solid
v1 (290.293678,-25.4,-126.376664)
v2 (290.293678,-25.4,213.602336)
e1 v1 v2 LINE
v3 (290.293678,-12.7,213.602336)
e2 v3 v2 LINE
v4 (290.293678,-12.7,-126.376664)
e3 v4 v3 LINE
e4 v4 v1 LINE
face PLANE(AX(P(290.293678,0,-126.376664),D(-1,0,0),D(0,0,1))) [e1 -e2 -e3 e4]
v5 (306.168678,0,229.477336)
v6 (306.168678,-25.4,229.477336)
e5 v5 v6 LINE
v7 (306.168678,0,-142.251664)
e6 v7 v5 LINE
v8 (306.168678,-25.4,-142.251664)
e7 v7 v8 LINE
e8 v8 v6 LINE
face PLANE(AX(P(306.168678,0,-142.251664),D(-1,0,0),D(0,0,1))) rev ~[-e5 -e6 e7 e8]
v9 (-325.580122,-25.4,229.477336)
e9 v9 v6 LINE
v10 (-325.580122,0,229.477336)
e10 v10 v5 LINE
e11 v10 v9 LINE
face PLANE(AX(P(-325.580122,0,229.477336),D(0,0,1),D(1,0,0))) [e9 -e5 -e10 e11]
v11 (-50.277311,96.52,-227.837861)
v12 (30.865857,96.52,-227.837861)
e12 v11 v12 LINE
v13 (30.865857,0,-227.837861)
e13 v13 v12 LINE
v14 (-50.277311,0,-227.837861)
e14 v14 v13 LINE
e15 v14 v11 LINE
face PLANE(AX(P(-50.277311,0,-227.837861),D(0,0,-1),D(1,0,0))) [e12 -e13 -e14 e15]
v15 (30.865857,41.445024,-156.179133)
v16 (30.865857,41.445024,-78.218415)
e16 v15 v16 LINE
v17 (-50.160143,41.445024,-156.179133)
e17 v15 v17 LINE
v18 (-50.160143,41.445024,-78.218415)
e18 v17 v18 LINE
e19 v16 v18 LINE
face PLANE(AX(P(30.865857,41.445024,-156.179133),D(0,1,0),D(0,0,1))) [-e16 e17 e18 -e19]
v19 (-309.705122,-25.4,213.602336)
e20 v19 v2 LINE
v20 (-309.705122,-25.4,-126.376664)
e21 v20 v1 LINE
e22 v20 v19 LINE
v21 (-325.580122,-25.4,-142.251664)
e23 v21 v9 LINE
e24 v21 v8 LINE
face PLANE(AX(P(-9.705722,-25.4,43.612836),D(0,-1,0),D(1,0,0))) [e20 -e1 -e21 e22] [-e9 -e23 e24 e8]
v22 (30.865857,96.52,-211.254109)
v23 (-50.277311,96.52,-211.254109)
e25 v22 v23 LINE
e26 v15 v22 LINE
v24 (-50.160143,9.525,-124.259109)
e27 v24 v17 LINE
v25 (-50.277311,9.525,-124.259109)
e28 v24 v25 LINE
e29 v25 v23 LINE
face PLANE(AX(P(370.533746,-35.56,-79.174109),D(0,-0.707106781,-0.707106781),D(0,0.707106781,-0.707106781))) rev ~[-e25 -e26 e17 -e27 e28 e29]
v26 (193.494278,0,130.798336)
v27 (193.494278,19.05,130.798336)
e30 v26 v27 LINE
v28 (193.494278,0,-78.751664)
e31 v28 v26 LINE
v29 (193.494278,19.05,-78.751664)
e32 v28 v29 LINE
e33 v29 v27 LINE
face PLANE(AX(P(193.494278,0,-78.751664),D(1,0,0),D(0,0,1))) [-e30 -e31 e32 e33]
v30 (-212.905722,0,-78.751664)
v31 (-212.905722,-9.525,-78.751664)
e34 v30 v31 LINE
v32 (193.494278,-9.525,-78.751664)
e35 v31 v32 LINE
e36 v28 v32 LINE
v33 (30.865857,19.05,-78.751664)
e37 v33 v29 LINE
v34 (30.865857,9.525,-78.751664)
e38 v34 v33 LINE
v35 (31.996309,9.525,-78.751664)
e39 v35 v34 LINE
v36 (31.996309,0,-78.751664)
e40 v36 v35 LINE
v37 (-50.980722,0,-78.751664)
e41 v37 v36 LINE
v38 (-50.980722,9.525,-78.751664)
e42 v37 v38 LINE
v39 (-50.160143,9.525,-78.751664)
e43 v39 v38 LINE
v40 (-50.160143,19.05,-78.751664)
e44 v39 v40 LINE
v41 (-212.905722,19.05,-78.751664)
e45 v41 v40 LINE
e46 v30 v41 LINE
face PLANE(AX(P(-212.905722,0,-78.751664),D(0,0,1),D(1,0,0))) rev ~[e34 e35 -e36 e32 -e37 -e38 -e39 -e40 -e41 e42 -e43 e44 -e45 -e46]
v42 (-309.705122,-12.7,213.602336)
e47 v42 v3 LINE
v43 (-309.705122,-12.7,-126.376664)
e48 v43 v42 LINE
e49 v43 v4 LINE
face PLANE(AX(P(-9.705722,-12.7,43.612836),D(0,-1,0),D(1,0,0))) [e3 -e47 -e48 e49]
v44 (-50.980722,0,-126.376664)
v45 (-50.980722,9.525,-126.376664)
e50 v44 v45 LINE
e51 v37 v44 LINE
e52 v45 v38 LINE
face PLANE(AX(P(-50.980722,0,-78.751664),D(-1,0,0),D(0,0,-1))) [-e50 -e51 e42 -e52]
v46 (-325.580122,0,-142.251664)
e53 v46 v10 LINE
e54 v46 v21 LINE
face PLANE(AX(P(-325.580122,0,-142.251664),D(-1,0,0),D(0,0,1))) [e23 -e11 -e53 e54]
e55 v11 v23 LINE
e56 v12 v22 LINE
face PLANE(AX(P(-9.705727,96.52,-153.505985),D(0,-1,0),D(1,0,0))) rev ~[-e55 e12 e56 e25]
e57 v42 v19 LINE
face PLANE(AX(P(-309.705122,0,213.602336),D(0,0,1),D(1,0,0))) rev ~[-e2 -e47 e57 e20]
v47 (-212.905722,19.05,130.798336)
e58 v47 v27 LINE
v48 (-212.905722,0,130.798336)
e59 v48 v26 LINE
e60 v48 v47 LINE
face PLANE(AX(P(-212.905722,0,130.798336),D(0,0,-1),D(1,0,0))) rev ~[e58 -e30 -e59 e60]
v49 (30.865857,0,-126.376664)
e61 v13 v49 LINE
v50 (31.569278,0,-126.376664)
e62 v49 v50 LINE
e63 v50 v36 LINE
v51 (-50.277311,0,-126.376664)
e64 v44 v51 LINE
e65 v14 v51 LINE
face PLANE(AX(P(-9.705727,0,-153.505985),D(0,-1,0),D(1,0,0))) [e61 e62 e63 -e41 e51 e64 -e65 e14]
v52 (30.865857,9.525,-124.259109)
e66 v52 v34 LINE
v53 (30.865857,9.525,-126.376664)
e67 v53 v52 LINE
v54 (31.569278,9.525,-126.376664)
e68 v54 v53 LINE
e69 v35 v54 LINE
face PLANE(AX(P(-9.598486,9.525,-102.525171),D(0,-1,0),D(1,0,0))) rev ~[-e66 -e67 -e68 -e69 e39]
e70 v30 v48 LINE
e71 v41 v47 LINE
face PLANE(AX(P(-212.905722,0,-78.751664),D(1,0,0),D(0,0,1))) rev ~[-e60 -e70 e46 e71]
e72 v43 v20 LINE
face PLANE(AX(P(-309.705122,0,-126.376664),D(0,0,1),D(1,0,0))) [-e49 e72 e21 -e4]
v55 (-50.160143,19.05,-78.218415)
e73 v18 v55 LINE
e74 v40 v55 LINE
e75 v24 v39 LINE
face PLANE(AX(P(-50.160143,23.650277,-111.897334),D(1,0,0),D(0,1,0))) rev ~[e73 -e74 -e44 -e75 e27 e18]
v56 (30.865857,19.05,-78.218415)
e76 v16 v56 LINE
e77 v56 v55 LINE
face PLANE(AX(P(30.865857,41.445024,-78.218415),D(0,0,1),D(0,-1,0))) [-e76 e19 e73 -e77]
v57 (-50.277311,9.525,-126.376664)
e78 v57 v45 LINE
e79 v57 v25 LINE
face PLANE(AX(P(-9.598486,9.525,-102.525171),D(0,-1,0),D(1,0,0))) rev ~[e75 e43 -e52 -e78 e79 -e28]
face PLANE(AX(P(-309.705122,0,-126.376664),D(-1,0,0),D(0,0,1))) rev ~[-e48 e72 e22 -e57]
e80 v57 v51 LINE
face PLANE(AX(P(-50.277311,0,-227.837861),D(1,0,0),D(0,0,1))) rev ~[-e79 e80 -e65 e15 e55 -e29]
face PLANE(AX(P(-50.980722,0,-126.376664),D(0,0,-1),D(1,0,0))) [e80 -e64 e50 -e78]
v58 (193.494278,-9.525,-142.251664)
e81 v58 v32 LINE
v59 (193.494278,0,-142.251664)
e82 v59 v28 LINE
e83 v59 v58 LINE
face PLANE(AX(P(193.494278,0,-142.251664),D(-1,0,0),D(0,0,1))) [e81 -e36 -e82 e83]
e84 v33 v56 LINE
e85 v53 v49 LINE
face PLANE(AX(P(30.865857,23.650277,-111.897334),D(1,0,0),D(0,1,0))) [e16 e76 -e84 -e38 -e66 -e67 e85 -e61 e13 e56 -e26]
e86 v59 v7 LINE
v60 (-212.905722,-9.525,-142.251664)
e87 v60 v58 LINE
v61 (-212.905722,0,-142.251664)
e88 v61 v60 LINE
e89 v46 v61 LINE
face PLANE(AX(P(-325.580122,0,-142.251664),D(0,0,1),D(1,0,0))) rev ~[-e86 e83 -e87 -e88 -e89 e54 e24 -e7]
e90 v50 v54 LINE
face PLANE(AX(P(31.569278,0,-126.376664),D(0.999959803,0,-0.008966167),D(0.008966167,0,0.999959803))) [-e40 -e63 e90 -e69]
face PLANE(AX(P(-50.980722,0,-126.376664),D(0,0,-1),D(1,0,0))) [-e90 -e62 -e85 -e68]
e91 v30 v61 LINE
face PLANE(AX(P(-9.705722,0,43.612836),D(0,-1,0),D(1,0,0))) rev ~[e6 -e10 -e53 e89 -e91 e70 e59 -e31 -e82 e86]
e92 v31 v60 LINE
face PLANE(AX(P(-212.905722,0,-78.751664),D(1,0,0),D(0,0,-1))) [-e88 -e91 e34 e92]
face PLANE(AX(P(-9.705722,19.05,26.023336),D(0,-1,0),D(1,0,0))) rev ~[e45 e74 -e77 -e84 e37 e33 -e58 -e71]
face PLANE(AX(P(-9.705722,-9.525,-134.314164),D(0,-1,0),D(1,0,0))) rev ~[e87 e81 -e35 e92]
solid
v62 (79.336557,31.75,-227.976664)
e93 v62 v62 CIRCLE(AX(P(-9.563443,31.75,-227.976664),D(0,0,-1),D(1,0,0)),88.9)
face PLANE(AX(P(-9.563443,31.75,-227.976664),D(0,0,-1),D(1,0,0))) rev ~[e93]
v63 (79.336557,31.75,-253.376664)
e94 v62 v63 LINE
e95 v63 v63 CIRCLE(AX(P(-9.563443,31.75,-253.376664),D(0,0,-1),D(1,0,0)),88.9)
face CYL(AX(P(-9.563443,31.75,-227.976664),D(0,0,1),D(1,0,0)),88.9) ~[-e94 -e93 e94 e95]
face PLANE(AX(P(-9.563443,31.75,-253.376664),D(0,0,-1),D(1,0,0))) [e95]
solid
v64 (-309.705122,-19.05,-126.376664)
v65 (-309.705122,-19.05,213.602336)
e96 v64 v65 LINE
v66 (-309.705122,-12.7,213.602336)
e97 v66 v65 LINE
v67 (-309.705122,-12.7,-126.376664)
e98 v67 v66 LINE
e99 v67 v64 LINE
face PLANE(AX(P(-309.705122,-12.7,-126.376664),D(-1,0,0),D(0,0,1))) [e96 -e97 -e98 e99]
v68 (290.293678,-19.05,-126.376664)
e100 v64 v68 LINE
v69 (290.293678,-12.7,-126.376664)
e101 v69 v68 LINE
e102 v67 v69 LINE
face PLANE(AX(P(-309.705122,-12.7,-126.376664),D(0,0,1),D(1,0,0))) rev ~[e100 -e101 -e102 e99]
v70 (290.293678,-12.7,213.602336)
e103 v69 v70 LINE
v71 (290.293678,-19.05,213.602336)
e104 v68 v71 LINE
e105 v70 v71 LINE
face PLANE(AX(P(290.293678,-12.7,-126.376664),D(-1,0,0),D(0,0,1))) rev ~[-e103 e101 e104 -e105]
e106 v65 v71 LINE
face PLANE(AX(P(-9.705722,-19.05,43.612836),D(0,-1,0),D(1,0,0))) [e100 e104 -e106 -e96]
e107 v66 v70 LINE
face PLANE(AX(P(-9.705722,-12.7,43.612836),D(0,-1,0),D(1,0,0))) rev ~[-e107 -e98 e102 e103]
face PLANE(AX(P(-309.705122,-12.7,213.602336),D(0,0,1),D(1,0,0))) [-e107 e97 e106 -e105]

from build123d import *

# Parameters (mm, degrees)
F0_W         = 631.7488
F0_H         = 371.729
F0_W_2       = 599.9988
F0_H_2       = 339.979
F1_DEPTH     = 25.4
F2_DEPTH     = 12.7
F3_W         = 406.4
F3_H         = 209.55
F4_DEPTH     = 19.05
F5_W         = 406.4
F5_H         = 15.875
F5_H_2       = 47.625
F6_DEPTH     = 9.525
F8_DEPTH     = 9.525
F9_W         = 76.4845596125
F9_H         = 31.75
F10_DEPTH    = 44.45
F11_W        = 76.4845596125
F11_H        = 44.45
F12_DEPTH    = 101.6
F13_R        = 88.9
F14_DEPTH    = 25.4
F16_DEPTH    = 76.4845596125
F17_DEPTH    = 6.35
F18_W        = 81.1431687325
F18_H        = 148.663751781
F19_DEPTH    = 96.52
F20_T4_DEPTH = 760.4789468336
F22_DEPTH    = 81.026


# Not quite as in the source:
# - a fillet or chamfer that OpenCascade refuses, or shapes differently, is made with other operations: its cross-section is extruded or revolved along the edge and cut away or added
# - a feature names something its author has since deleted; it is built from what else it names


with BuildPart() as f1:
    # F0 (on Front) → F1 (new body)
    with BuildSketch(Plane.XZ):
        with Locations((-9.705722332, 43.6128355046)):
            Rectangle(F0_W, F0_H)
        with Locations((-9.705722332, 43.6128355046)):
            Rectangle(F0_W_2, F0_H_2, mode=Mode.SUBTRACT)
    extrude(amount=F1_DEPTH)

    # F0 (on Front) → F2 (join)
    with BuildSketch(Plane.XZ):
        with Locations((-9.705722332, 43.6128355046)):
            Rectangle(F0_W_2, F0_H_2)
    extrude(amount=F2_DEPTH)

    # F3 (on face) → F4 (join)
    with BuildSketch(Plane.XZ):
        with Locations((-9.705722332, 26.0233355046)):
            Rectangle(F3_W, F3_H)
    extrude(amount=-F4_DEPTH)

    # F5 (on face) → F6 (cut)
    with BuildSketch(Plane.XZ):
        with Locations((-9.705722332, -134.3141644954)):
            Rectangle(F5_W, F5_H)
        with Locations((-9.705722332, -102.5641644954)):
            Rectangle(F5_W, F5_H_2)
    extrude(amount=F6_DEPTH, mode=Mode.SUBTRACT)

    # F7 (on face) → F8 (join)
    with BuildSketch(Plane.XZ):
        Polygon((-50.980722332, -126.3766644954), (31.569277668, -126.3766644954), (31.9963085321, -78.7516644954), (31.569277668, -78.7516644954), (-50.980722332, -78.7516644954), align=None)
    extrude(amount=-F8_DEPTH)

    # F9 (on face) → F10 (join)
    with BuildSketch(Plane(origin=(0, 9.525, 0), x_dir=(-1, 0, 0), z_dir=(0, 1, 0))):
        with Locations((9.5634425258, -110.5016644954)):
            Rectangle(F9_W, F9_H)
    extrude(amount=F10_DEPTH)

    # F11 (on face) → F12 (join)
    with BuildSketch(Plane(origin=(0, 0, -126.3766644954), x_dir=(1, 0, 0), z_dir=(0, 0, -1))):
        with Locations((-9.5634425258, -31.75)):
            Rectangle(F11_W, F11_H)
    extrude(amount=F12_DEPTH)

    # F15 (on face) → F16 (cut, through all)
    with BuildSketch(Plane(origin=(-47.805722332, 0, 0), x_dir=(0, -1, 0), z_dir=(-1, 0, 0))):
        Polygon((-9.525, -126.3766644954), (-9.525, -94.6266644954), (-53.975, -94.6266644954), (-53.975, -227.9766644954), (-9.525, -227.9766644954), align=None)
    extrude(amount=-F16_DEPTH, mode=Mode.SUBTRACT)


with BuildPart() as f14:
    # F13 (on face) → F14 (new body)
    with BuildSketch(Plane(origin=(0, 0, -227.9766644954), x_dir=(1, 0, 0), z_dir=(0, 0, -1))):
        with Locations((-9.5634425258, -31.75)):
            Circle(F13_R)
    extrude(amount=F14_DEPTH)


with BuildPart() as f17:
    # F17 (new): a face of the model
    f17_faces = [f1.part.faces().sort_by_distance(p)[0] for p in [
        (-9.705722332, -12.7, 43.6128355046),
    ]]
    extrude(f17_faces, amount=F17_DEPTH)


with BuildPart() as f1_1:
    add(f1.part)

    # F18 (on Front) → F19 (join)
    with BuildSketch(Plane.XZ):
        with Locations((-9.7057269886, -153.5059846938)):
            Rectangle(F18_W, F18_H)
    extrude(amount=-F19_DEPTH)

    # F20: chamfer of 132.08 on 1 edges, made by hand


with BuildPart() as f20_tool2:
    # F20_s3 → F20_t4 (new body)
    with BuildSketch(Plane.YZ.offset(370.5337464282)):
        Polygon((-35.56, -79.1741088033), (96.52, -211.2541088033), (96.52, -79.1741088033), align=None)
    extrude(amount=-F20_T4_DEPTH)

    split(bisect_by=Plane.XZ.offset(-9.525), keep=Keep.BOTTOM)


with BuildPart() as f1_2:
    add(f1_1.part)

    # F20_t1: cut F20_tool2
    add(f20_tool2.part, mode=Mode.SUBTRACT)

    # F21 (on face) → F22 (join)
    with BuildSketch(Plane.YZ.offset(30.8658573776)):
        Polygon((41.4450243115, -78.2184153795), (0, -78.2184153795), (0, -126.3766644954), (9.525, -126.3766644954), (9.525, -124.2591088033), (41.4450243115, -156.1791331148), align=None)
    extrude(amount=-F22_DEPTH)


solid = Compound([f14.part, f17.part, f1_2.part])
